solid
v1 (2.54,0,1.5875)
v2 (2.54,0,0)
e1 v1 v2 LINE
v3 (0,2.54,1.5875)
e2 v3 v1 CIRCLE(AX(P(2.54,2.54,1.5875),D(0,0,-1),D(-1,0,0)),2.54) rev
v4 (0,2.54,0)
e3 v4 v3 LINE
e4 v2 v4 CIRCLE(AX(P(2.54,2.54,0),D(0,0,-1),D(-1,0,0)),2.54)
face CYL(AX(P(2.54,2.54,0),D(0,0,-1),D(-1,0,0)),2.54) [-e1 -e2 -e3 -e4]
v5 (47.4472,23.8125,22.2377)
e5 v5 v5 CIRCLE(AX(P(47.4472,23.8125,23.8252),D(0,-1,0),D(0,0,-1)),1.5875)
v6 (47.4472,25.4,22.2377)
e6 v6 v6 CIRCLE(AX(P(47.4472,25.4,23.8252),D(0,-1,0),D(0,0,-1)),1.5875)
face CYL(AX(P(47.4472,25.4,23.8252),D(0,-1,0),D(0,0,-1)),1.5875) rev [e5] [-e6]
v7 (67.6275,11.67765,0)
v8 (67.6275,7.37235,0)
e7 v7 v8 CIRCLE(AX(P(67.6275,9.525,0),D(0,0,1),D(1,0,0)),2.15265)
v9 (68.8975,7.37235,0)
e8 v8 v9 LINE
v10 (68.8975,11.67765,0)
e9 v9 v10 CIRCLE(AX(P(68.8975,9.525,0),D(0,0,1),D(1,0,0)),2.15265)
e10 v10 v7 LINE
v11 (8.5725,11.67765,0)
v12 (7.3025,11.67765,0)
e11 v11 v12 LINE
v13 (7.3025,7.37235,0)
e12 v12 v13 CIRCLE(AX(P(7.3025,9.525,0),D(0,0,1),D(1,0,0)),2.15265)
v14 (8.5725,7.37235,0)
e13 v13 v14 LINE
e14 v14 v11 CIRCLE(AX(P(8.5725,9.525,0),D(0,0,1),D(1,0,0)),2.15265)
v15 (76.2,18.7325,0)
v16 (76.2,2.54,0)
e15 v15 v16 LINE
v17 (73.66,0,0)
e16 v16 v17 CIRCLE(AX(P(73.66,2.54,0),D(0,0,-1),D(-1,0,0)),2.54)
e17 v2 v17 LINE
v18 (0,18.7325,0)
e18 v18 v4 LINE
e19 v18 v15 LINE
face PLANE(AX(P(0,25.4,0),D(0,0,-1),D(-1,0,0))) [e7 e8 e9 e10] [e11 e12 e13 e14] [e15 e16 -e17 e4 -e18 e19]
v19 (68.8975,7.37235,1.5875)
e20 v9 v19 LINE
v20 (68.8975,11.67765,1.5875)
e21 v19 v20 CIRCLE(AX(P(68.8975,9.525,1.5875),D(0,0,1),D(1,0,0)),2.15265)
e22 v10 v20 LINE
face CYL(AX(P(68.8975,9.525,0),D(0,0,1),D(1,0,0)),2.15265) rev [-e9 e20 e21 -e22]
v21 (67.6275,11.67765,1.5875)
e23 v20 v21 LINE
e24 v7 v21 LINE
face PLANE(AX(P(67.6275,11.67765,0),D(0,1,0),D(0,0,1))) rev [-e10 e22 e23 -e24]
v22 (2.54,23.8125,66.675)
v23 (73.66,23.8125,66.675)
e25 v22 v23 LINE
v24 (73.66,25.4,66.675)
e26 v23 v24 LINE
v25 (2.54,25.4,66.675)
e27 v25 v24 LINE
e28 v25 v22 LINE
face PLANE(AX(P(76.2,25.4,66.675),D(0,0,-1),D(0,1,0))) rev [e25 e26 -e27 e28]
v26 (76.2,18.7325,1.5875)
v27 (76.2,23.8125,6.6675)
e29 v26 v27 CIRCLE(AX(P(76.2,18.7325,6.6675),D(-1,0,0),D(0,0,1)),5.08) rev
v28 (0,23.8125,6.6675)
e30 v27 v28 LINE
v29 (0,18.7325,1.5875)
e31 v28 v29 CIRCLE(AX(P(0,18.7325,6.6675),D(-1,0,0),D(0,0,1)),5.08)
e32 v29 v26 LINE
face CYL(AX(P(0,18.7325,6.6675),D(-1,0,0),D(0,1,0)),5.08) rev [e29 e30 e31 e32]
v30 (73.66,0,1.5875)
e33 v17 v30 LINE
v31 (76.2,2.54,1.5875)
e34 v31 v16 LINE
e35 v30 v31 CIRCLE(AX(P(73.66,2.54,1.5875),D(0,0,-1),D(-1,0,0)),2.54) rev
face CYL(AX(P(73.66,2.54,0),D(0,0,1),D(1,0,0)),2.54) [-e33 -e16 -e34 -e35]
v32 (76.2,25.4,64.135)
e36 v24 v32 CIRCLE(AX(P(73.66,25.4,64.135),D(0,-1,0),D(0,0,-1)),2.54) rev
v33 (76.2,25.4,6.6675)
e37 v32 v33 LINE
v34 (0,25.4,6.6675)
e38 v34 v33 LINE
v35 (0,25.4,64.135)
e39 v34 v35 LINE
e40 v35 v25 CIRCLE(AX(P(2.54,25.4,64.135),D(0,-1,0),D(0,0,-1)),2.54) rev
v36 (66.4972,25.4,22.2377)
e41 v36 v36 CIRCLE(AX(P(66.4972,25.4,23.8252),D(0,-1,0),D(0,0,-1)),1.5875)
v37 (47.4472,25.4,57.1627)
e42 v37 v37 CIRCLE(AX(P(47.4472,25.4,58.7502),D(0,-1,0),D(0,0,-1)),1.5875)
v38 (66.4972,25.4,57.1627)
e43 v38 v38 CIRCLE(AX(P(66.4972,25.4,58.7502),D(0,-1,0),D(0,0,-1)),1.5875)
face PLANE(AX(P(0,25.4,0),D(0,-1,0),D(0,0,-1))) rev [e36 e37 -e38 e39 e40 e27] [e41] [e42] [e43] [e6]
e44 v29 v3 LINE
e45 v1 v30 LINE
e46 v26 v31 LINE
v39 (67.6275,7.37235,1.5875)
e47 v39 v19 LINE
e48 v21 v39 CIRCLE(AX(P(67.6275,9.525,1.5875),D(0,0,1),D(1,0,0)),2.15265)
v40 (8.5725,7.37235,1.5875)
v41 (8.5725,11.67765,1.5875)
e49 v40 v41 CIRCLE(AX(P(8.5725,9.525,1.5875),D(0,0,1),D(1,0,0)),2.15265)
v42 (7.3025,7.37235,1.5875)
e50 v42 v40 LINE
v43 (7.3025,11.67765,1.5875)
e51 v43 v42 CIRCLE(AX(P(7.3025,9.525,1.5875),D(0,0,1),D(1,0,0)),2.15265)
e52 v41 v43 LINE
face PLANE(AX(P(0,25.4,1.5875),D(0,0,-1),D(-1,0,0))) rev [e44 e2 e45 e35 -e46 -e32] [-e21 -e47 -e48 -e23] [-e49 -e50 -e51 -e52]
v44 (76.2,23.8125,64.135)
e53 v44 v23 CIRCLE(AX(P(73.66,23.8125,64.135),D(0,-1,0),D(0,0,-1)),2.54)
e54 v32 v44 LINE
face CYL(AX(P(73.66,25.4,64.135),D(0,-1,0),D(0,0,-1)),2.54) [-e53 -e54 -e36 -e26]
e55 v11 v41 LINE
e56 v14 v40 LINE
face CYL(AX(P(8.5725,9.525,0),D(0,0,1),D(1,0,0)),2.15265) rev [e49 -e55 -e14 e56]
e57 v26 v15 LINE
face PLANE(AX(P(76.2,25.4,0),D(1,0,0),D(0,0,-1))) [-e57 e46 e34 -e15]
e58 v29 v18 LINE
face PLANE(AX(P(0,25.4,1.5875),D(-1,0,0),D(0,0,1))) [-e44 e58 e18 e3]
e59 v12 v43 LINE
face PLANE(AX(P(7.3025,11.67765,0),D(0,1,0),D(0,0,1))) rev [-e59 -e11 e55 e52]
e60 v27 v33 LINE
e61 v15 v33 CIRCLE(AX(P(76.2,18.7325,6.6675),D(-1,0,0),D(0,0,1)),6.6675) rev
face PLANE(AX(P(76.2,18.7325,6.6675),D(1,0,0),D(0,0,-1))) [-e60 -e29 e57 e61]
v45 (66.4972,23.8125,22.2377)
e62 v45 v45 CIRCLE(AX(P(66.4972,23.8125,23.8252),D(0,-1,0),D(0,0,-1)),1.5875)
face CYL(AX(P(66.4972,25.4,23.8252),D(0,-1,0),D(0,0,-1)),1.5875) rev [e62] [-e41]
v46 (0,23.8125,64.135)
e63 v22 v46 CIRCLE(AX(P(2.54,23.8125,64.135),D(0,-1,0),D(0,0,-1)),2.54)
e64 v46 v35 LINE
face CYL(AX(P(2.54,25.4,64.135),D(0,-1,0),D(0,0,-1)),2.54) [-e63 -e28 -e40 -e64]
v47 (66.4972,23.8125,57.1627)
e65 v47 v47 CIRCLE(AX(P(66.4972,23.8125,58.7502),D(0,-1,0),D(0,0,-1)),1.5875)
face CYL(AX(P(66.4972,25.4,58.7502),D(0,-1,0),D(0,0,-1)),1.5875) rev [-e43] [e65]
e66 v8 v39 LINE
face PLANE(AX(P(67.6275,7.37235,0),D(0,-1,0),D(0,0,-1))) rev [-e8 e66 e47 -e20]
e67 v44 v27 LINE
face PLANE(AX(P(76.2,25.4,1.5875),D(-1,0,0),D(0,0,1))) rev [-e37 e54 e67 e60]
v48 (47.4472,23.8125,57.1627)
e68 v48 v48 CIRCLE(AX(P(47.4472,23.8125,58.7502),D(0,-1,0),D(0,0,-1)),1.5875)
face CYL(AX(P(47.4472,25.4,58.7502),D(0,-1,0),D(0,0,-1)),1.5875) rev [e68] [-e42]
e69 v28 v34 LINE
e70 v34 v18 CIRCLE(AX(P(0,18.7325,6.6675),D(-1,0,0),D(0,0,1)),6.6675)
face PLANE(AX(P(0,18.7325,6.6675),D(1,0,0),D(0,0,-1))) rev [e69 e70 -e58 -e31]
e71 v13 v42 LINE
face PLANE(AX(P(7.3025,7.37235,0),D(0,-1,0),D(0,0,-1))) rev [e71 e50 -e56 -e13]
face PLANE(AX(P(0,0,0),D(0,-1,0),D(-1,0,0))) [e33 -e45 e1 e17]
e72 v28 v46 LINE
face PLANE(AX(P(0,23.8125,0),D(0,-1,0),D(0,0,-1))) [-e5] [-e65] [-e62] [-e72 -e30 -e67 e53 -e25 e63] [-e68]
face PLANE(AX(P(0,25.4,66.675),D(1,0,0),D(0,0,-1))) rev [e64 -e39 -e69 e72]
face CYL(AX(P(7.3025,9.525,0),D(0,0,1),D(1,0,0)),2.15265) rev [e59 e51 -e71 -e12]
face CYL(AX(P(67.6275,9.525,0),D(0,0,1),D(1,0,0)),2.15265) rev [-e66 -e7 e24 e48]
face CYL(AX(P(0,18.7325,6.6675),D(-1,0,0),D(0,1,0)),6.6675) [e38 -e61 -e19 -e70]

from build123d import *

# Parameters (mm, degrees)
SKETCH2_W                    = 76.2
SKETCH2_H                    = 1.5875
BASE_FLANGE1_DEPTH           = 25.4
EDGE_FLANGE1_STRIP_W         = 16.51
EDGE_FLANGE1_STRIP_H         = 1.5875
EDGE_FLANGE1_STRIP_CUT_DEPTH = 76.2
EDGE_FLANGE1_DEPTH           = 76.2
FILLET1_R                    = 2.54
CUT_EXTRUDE1_DEPTH           = 104.382699985
SKETCH11_R                   = 1.5875
CUT_EXTRUDE2_DEPTH           = 105.014570043


# Sheet-metal steps are written as plain solids
with BuildPart() as part:
    # Sketch2 → Base-Flange1 (new body)
    with BuildSketch(Plane(origin=(0, 0, 0), x_dir=(1, 0, 0), z_dir=(0, 1, 0))):
        with Locations((38.1, -0.79375)):
            Rectangle(SKETCH2_W, SKETCH2_H)
    extrude(amount=BASE_FLANGE1_DEPTH)

    # Edge-Flange1 strip (across the edge) → Edge-Flange1 strip cut (cut)
    with BuildSketch(Plane(origin=(76.2, 25.4, 1.5875), x_dir=(0, -1, 0), z_dir=(-1, 0, 0))):
        with Locations((-1.5875, -0.79375)):
            Rectangle(EDGE_FLANGE1_STRIP_W, EDGE_FLANGE1_STRIP_H)
    extrude(amount=EDGE_FLANGE1_STRIP_CUT_DEPTH, mode=Mode.SUBTRACT)

    # Edge-Flange1 section (across the edge) → Edge-Flange1 (add)
    with BuildSketch(Plane(origin=(76.2, 25.4, 1.5875), x_dir=(0, -1, 0), z_dir=(-1, 0, 0))):
        with BuildLine():
            Line((0, 5.08), (0, 65.0875))
            Line((0, 65.0875), (1.5875, 65.0875))
            Line((1.5875, 65.0875), (1.5875, 5.08))
            ThreePointArc((1.5875, 5.08), (3.075397552, 1.487897552), (6.6675, 0))
            Line((6.6675, 0), (6.6675, -1.5875))
            ThreePointArc((6.6675, -1.5875), (1.952865536, 0.365365536), (0, 5.08))
        make_face()
    extrude(amount=EDGE_FLANGE1_DEPTH)

    # Fillet1
    fillet1_edges = [part.edges().sort_by_distance(p)[0] for p in [
        (76.2, 24.60625, 66.675),
        (0, 24.60625, 66.675),
        (0, 0, 0.79375),
        (76.2, 0, 0.79375),
    ]]
    fillet(fillet1_edges, radius=FILLET1_R)

    # Sketch10 → Cut-Extrude1 (cut, through all)
    with BuildSketch(Plane.XY.offset(1.5875)):
        with BuildLine():
            Line((7.3025, 11.67765), (8.5725, 11.67765))
            ThreePointArc((8.5725, 11.67765), (10.72515, 9.525), (8.5725, 7.37235))
            Line((8.5725, 7.37235), (7.3025, 7.37235))
            ThreePointArc((7.3025, 7.37235), (5.14985, 9.525), (7.3025, 11.67765))
        make_face()
        with BuildLine():
            Line((67.6275, 11.67765), (68.8975, 11.67765))
            ThreePointArc((68.8975, 11.67765), (71.05015, 9.525), (68.8975, 7.37235))
            Line((68.8975, 7.37235), (67.6275, 7.37235))
            ThreePointArc((67.6275, 7.37235), (65.47485, 9.525), (67.6275, 11.67765))
        make_face()
    extrude(amount=-CUT_EXTRUDE1_DEPTH, mode=Mode.SUBTRACT)

    # Sketch11 → Cut-Extrude2 (cut, through all)
    with BuildSketch(Plane.XZ.offset(-23.8125)):
        with Locations(Location((66.4972, 58.7502, 0), (0, 0, 270))):
            Circle(SKETCH11_R)
        with Locations(Location((66.4972, 23.8252, 0), (0, 0, 270))):
            Circle(SKETCH11_R)
        with Locations(Location((47.4472, 23.8252, 0), (0, 0, 270))):
            Circle(SKETCH11_R)
        with Locations(Location((47.4472, 58.7502, 0), (0, 0, 270))):
            Circle(SKETCH11_R)
    extrude(amount=-CUT_EXTRUDE2_DEPTH, mode=Mode.SUBTRACT)


solid = part.part
